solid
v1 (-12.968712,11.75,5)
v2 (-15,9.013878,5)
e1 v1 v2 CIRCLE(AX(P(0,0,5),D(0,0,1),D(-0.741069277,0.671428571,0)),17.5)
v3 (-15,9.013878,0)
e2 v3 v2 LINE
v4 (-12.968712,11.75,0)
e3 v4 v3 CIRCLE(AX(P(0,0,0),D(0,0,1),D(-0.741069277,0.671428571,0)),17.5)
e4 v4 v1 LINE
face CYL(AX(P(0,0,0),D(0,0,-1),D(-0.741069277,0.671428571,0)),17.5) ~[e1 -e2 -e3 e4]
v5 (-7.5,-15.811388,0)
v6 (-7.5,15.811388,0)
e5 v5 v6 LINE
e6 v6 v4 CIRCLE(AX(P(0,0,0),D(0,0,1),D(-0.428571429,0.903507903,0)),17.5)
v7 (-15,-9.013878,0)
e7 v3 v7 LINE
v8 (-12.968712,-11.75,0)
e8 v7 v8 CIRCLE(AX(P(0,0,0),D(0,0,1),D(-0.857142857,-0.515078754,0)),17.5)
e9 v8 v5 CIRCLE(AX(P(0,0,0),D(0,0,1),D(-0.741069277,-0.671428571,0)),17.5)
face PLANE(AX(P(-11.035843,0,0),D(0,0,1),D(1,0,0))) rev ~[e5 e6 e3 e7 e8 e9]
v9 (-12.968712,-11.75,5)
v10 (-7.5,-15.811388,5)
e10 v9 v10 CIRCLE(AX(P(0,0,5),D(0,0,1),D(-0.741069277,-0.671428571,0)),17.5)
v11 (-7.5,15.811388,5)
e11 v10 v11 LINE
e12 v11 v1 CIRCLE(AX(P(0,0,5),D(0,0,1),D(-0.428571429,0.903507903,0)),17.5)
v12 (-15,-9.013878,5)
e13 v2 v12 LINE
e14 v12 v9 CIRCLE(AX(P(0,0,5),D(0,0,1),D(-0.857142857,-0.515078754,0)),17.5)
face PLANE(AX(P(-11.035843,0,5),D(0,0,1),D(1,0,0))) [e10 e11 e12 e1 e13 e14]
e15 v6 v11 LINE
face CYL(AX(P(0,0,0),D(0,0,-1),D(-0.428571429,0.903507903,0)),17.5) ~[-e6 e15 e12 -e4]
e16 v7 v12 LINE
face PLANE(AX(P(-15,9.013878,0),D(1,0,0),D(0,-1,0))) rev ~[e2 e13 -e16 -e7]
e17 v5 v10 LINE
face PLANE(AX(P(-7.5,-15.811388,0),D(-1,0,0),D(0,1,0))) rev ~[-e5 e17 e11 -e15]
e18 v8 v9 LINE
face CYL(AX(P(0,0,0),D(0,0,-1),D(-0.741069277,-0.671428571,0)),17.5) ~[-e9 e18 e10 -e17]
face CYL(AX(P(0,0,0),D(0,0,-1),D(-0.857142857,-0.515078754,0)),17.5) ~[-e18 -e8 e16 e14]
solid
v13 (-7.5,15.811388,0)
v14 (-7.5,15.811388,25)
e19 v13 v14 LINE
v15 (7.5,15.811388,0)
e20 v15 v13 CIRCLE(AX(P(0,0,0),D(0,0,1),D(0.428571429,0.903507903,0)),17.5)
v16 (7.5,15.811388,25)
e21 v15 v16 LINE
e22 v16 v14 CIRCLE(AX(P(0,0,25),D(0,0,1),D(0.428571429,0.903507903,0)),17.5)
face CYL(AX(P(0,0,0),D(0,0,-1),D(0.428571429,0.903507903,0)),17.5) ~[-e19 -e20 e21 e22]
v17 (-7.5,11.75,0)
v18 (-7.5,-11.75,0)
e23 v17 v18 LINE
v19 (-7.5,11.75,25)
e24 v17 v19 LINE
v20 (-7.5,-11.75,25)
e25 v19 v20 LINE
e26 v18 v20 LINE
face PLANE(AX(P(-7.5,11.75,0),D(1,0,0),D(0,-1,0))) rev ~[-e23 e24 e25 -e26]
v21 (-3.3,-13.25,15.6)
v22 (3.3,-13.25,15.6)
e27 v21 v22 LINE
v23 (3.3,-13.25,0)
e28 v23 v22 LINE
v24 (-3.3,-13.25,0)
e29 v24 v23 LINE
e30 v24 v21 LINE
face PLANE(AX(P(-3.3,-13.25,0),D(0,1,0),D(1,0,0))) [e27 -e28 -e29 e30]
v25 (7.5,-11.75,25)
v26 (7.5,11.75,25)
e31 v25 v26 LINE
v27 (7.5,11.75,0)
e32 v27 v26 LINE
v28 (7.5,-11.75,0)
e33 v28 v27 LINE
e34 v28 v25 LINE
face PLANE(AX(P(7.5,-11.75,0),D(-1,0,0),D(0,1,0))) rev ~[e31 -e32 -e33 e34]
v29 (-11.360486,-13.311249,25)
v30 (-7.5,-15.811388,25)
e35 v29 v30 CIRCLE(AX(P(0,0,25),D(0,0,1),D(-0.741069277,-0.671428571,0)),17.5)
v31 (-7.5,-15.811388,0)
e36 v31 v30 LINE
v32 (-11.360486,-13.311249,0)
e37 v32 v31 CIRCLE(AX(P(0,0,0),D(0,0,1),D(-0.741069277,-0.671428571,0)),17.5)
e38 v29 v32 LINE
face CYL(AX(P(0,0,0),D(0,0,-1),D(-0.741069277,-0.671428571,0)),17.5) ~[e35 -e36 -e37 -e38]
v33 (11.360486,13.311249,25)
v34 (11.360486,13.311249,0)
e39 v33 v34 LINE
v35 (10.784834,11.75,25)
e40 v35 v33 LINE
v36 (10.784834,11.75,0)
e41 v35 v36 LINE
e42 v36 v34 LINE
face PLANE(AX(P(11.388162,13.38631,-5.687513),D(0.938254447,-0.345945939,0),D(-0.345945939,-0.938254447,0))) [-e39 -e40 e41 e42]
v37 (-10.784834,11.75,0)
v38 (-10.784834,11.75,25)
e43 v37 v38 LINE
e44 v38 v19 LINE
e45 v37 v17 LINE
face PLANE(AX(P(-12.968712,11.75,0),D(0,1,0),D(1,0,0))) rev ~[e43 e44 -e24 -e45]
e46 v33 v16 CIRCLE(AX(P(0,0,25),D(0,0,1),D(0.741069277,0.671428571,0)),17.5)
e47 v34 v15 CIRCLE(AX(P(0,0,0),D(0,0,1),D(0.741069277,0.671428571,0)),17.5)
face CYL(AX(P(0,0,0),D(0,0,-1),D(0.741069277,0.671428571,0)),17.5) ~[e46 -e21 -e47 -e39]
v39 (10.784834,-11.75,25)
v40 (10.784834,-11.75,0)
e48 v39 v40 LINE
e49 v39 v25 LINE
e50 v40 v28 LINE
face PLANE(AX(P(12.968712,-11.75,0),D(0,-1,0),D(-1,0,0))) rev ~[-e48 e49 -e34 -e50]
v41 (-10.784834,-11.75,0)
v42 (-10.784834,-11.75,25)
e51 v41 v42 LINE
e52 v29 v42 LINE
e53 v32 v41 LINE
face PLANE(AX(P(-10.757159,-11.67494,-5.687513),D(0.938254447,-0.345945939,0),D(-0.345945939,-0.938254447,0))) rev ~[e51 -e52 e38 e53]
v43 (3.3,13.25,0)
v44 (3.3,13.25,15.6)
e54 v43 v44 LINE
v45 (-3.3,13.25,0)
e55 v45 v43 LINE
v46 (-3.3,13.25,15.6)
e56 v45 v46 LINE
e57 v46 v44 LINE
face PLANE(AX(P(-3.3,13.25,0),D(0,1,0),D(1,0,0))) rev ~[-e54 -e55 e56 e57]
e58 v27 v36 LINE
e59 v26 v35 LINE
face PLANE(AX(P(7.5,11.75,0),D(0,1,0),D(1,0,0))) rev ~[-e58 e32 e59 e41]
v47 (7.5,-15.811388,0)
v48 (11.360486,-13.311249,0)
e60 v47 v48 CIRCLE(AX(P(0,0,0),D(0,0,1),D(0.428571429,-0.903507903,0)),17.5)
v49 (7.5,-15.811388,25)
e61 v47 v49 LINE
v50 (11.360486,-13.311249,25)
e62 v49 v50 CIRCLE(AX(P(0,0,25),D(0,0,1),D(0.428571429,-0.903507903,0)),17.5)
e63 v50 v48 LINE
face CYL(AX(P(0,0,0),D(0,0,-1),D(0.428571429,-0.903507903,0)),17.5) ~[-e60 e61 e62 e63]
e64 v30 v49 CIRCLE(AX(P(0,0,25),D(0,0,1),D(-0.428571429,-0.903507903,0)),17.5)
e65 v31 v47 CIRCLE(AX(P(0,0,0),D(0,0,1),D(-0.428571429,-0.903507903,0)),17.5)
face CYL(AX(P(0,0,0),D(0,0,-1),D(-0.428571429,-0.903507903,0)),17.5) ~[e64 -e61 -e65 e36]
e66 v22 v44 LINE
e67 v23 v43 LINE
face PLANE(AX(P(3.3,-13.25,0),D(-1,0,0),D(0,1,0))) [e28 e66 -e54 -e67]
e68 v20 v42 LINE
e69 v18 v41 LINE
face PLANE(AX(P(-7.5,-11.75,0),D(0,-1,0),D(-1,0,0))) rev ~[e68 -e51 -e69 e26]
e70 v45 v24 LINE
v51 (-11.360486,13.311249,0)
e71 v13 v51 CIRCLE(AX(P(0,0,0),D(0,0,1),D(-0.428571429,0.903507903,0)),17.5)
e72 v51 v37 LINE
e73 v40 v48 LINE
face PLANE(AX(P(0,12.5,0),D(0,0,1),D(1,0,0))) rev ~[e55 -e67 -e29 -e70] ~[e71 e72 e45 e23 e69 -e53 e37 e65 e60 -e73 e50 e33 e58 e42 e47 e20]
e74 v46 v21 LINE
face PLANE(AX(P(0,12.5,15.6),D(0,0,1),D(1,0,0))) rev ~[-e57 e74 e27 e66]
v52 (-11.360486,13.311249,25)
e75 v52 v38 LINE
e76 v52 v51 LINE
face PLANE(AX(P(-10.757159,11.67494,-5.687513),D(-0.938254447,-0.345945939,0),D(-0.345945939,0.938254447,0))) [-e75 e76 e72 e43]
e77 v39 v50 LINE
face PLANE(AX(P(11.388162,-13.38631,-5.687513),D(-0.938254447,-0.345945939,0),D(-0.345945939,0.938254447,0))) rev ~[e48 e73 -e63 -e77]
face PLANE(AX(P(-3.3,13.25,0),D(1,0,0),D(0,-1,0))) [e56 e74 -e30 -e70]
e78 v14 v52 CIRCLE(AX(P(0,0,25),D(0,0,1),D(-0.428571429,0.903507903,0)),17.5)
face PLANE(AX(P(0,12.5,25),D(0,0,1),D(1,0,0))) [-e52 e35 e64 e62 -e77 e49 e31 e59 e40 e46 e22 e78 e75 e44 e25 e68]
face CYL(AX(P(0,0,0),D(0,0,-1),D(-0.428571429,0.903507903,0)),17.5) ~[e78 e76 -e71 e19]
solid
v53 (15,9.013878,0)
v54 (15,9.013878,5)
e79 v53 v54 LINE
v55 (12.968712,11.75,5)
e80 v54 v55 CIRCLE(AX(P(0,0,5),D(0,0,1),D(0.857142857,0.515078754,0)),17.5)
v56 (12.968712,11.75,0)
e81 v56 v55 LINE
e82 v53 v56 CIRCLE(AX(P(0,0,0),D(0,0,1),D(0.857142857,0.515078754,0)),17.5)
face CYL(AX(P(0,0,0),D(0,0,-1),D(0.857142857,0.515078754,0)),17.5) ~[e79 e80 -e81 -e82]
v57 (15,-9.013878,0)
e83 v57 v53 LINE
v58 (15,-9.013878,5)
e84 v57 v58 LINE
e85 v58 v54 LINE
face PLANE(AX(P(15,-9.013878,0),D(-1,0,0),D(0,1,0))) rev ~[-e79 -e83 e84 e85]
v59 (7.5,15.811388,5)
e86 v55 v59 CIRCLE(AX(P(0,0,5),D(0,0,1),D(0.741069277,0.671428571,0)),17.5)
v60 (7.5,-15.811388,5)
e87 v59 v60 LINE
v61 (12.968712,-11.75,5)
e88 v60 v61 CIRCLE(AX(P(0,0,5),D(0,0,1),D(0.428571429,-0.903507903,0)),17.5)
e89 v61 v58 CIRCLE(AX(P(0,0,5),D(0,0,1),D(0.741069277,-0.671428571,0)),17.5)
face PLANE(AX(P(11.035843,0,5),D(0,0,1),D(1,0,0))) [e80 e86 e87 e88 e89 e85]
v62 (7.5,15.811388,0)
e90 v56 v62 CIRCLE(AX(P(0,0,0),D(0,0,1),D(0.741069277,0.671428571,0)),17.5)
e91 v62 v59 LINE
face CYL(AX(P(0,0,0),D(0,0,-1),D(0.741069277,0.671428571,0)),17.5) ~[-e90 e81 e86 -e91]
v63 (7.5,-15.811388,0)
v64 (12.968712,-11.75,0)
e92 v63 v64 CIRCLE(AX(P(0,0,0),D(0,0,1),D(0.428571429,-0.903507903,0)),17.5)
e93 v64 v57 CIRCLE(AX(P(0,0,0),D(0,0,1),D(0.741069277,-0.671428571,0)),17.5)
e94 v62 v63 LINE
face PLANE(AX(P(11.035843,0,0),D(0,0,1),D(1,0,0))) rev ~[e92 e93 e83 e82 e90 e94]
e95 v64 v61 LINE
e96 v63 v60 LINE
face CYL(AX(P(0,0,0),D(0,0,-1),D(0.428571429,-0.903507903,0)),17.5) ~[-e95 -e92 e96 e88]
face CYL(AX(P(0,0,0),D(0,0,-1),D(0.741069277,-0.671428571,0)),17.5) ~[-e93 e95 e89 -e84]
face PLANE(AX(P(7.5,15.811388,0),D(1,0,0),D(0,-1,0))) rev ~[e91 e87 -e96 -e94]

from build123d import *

# Parameters (mm, degrees)
F1_DEPTH    = 5
F0_W        = 6.6
F0_H        = 1.5
F0_W_2      = 4.2
F0_H_2      = 23.5
F2_DEPTH    = 25
F3_DEPTH    = 15.6
F4_T1_DEPTH = 36.3750267574


# Not quite as in the source:
# - a fillet or chamfer that OpenCascade refuses, or shapes differently, is made with other operations: its cross-section is extruded or revolved along the edge and cut away or added


with BuildPart() as f1:
    # F0 (on Top) → F1 (new body)
    with BuildSketch(Plane.XY):
        with BuildLine():
            Line((15, -9.0138781887), (15, 9.0138781887))
            ThreePointArc((15, 9.0138781887), (14.0511141288, 10.4314999755), (12.9687123493, 11.75))
            Line((12.9687123493, 11.75), (7.5, 11.75))
            Line((7.5, 11.75), (7.5, -11.75))
            Line((7.5, -11.75), (12.9687123493, -11.75))
            ThreePointArc((12.9687123493, -11.75), (14.0511141288, -10.4314999755), (15, -9.0138781887))
        make_face()
        with BuildLine():
            ThreePointArc((7.5, -15.8113883008), (10.4338758399, -14.0493499834), (12.9687123493, -11.75))
            Line((12.9687123493, -11.75), (7.5, -11.75))
            Line((7.5, -11.75), (7.5, -15.8113883008))
        make_face()
        with BuildLine():
            Line((7.5, 11.75), (12.9687123493, 11.75))
            ThreePointArc((12.9687123493, 11.75), (10.4338758399, 14.0493499834), (7.5, 15.8113883008))
            Line((7.5, 15.8113883008), (7.5, 11.75))
        make_face()
    extrude(amount=F1_DEPTH)


with BuildPart() as f1b:
    # F0 (on Top) → F1, piece 2 (new body)
    with BuildSketch(Plane.XY):
        with BuildLine():
            Line((-7.5, 11.75), (-12.9687123493, 11.75))
            ThreePointArc((-12.9687123493, 11.75), (-14.0511141288, 10.4314999755), (-15, 9.0138781887))
            Line((-15, 9.0138781887), (-15, -9.0138781887))
            ThreePointArc((-15, -9.0138781887), (-14.0511141288, -10.4314999755), (-12.9687123493, -11.75))
            Line((-12.9687123493, -11.75), (-7.5, -11.75))
            Line((-7.5, -11.75), (-7.5, 11.75))
        make_face()
        with BuildLine():
            Line((-7.5, 11.75), (-7.5, 15.8113883008))
            ThreePointArc((-7.5, 15.8113883008), (-10.4338758399, 14.0493499834), (-12.9687123493, 11.75))
            Line((-12.9687123493, 11.75), (-7.5, 11.75))
        make_face()
        with BuildLine():
            ThreePointArc((-12.9687123493, -11.75), (-10.4338758399, -14.0493499834), (-7.5, -15.8113883008))
            Line((-7.5, -15.8113883008), (-7.5, -11.75))
            Line((-7.5, -11.75), (-12.9687123493, -11.75))
        make_face()
    extrude(amount=F1_DEPTH)


with BuildPart() as f2:
    # F0 (on Top) → F2 (new body)
    with BuildSketch(Plane.XY):
        with Locations((0, 12.5)):
            Rectangle(F0_W, F0_H)
        with BuildLine():
            Line((7.5, 11.75), (7.5, 15.8113883008))
            ThreePointArc((7.5, 15.8113883008), (0, 17.5), (-7.5, 15.8113883008))
            Line((-7.5, 15.8113883008), (-7.5, 11.75))
            Line((-7.5, 11.75), (-3.3, 11.75))
            Line((-3.3, 11.75), (-3.3, 13.25))
            Line((-3.3, 13.25), (3.3, 13.25))
            Line((3.3, 13.25), (3.3, 11.75))
            Line((3.3, 11.75), (7.5, 11.75))
        make_face()
        with Locations((-5.4, 0)):
            Rectangle(F0_W_2, F0_H_2)
        with BuildLine():
            ThreePointArc((-7.5, -15.8113883008), (0, -17.5), (7.5, -15.8113883008))
            Line((7.5, -15.8113883008), (7.5, -11.75))
            Line((7.5, -11.75), (3.3, -11.75))
            Line((3.3, -11.75), (3.3, -13.25))
            Line((3.3, -13.25), (-3.3, -13.25))
            Line((-3.3, -13.25), (-3.3, -11.75))
            Line((-3.3, -11.75), (-7.5, -11.75))
            Line((-7.5, -11.75), (-7.5, -15.8113883008))
        make_face()
        with Locations((5.4, 0)):
            Rectangle(F0_W_2, F0_H_2)
        Rectangle(F0_W, F0_H_2)
        with Locations((0, -12.5)):
            Rectangle(F0_W, F0_H)
        with BuildLine():
            ThreePointArc((-12.9687123493, -11.75), (-10.4338758399, -14.0493499834), (-7.5, -15.8113883008))
            Line((-7.5, -15.8113883008), (-7.5, -11.75))
            Line((-7.5, -11.75), (-12.9687123493, -11.75))
        make_face()
        with BuildLine():
            Line((-7.5, 11.75), (-7.5, 15.8113883008))
            ThreePointArc((-7.5, 15.8113883008), (-10.4338758399, 14.0493499834), (-12.9687123493, 11.75))
            Line((-12.9687123493, 11.75), (-7.5, 11.75))
        make_face()
        with BuildLine():
            Line((7.5, 11.75), (12.9687123493, 11.75))
            ThreePointArc((12.9687123493, 11.75), (10.4338758399, 14.0493499834), (7.5, 15.8113883008))
            Line((7.5, 15.8113883008), (7.5, 11.75))
        make_face()
        with BuildLine():
            ThreePointArc((7.5, -15.8113883008), (10.4338758399, -14.0493499834), (12.9687123493, -11.75))
            Line((12.9687123493, -11.75), (7.5, -11.75))
            Line((7.5, -11.75), (7.5, -15.8113883008))
        make_face()
    extrude(amount=F2_DEPTH)

    # F0 (on Top) → F3 (cut)
    with BuildSketch(Plane.XY):
        with Locations((0, 12.5)):
            Rectangle(F0_W, F0_H)
        Rectangle(F0_W, F0_H_2)
        with Locations((0, -12.5)):
            Rectangle(F0_W, F0_H)
    extrude(amount=F3_DEPTH, mode=Mode.SUBTRACT)

    # F4: chamfer of 2 on 4 edges, made by hand

    # F4_s2 → F4_t1 (cut)
    with BuildSketch(Plane.XY.offset(-5.6875133787)):
        with BuildLine():
            Line((-10.7571586121, -11.6749396443), (-11.3881617362, -13.3863096005))
            Line((-11.3881617362, -13.3863096005), (-11.4141285615, -13.4167353131))
            ThreePointArc((-11.4141285615, -13.4167353131), (-12.2058182488, -12.5964122224), (-12.9983551204, -11.7768571429))
            Line((-12.9983551204, -11.7768571429), (-12.9687123493, -11.71))
            ThreePointArc((-12.9687123493, -11.71), (-11.8629354807, -11.71), (-10.7571586121, -11.6349396443))
            Line((-10.7571586121, -11.6349396443), (-10.7571586121, -11.6749396443))
        make_face()
        with BuildLine():
            Line((11.3881617362, -13.3863096005), (10.7571586121, -11.6749396443))
            Line((10.7571586121, -11.6749396443), (10.7571586121, -11.6349396443))
            ThreePointArc((10.7571586121, -11.6349396443), (11.8629354807, -11.71), (12.9687123493, -11.71))
            Line((12.9687123493, -11.71), (12.9983551204, -11.7768571429))
            ThreePointArc((12.9983551204, -11.7768571429), (12.2058182488, -12.5964122224), (11.4141285615, -13.4167353131))
            Line((11.4141285615, -13.4167353131), (11.3881617362, -13.3863096005))
        make_face()
        with BuildLine():
            Line((11.3881617362, 13.3863096005), (10.7571586121, 11.6749396443))
            Line((10.7571586121, 11.6749396443), (10.7571586121, 11.6349396443))
            ThreePointArc((10.7571586121, 11.6349396443), (11.8629354807, 11.71), (12.9687123493, 11.71))
            Line((12.9687123493, 11.71), (12.9983551204, 11.7768571429))
            ThreePointArc((12.9983551204, 11.7768571429), (12.2058182488, 12.5964122224), (11.4141285615, 13.4167353131))
            Line((11.4141285615, 13.4167353131), (11.3881617362, 13.3863096005))
        make_face()
        with BuildLine():
            Line((-10.7571586121, 11.6749396443), (-11.3881617362, 13.3863096005))
            Line((-11.3881617362, 13.3863096005), (-11.4141285615, 13.4167353131))
            ThreePointArc((-11.4141285615, 13.4167353131), (-12.2058182488, 12.5964122224), (-12.9983551204, 11.7768571429))
            Line((-12.9983551204, 11.7768571429), (-12.9687123493, 11.71))
            ThreePointArc((-12.9687123493, 11.71), (-11.8629354807, 11.71), (-10.7571586121, 11.6349396443))
            Line((-10.7571586121, 11.6349396443), (-10.7571586121, 11.6749396443))
        make_face()
    extrude(amount=F4_T1_DEPTH, mode=Mode.SUBTRACT)


solid = Compound([f1.part, f1b.part, f2.part])
